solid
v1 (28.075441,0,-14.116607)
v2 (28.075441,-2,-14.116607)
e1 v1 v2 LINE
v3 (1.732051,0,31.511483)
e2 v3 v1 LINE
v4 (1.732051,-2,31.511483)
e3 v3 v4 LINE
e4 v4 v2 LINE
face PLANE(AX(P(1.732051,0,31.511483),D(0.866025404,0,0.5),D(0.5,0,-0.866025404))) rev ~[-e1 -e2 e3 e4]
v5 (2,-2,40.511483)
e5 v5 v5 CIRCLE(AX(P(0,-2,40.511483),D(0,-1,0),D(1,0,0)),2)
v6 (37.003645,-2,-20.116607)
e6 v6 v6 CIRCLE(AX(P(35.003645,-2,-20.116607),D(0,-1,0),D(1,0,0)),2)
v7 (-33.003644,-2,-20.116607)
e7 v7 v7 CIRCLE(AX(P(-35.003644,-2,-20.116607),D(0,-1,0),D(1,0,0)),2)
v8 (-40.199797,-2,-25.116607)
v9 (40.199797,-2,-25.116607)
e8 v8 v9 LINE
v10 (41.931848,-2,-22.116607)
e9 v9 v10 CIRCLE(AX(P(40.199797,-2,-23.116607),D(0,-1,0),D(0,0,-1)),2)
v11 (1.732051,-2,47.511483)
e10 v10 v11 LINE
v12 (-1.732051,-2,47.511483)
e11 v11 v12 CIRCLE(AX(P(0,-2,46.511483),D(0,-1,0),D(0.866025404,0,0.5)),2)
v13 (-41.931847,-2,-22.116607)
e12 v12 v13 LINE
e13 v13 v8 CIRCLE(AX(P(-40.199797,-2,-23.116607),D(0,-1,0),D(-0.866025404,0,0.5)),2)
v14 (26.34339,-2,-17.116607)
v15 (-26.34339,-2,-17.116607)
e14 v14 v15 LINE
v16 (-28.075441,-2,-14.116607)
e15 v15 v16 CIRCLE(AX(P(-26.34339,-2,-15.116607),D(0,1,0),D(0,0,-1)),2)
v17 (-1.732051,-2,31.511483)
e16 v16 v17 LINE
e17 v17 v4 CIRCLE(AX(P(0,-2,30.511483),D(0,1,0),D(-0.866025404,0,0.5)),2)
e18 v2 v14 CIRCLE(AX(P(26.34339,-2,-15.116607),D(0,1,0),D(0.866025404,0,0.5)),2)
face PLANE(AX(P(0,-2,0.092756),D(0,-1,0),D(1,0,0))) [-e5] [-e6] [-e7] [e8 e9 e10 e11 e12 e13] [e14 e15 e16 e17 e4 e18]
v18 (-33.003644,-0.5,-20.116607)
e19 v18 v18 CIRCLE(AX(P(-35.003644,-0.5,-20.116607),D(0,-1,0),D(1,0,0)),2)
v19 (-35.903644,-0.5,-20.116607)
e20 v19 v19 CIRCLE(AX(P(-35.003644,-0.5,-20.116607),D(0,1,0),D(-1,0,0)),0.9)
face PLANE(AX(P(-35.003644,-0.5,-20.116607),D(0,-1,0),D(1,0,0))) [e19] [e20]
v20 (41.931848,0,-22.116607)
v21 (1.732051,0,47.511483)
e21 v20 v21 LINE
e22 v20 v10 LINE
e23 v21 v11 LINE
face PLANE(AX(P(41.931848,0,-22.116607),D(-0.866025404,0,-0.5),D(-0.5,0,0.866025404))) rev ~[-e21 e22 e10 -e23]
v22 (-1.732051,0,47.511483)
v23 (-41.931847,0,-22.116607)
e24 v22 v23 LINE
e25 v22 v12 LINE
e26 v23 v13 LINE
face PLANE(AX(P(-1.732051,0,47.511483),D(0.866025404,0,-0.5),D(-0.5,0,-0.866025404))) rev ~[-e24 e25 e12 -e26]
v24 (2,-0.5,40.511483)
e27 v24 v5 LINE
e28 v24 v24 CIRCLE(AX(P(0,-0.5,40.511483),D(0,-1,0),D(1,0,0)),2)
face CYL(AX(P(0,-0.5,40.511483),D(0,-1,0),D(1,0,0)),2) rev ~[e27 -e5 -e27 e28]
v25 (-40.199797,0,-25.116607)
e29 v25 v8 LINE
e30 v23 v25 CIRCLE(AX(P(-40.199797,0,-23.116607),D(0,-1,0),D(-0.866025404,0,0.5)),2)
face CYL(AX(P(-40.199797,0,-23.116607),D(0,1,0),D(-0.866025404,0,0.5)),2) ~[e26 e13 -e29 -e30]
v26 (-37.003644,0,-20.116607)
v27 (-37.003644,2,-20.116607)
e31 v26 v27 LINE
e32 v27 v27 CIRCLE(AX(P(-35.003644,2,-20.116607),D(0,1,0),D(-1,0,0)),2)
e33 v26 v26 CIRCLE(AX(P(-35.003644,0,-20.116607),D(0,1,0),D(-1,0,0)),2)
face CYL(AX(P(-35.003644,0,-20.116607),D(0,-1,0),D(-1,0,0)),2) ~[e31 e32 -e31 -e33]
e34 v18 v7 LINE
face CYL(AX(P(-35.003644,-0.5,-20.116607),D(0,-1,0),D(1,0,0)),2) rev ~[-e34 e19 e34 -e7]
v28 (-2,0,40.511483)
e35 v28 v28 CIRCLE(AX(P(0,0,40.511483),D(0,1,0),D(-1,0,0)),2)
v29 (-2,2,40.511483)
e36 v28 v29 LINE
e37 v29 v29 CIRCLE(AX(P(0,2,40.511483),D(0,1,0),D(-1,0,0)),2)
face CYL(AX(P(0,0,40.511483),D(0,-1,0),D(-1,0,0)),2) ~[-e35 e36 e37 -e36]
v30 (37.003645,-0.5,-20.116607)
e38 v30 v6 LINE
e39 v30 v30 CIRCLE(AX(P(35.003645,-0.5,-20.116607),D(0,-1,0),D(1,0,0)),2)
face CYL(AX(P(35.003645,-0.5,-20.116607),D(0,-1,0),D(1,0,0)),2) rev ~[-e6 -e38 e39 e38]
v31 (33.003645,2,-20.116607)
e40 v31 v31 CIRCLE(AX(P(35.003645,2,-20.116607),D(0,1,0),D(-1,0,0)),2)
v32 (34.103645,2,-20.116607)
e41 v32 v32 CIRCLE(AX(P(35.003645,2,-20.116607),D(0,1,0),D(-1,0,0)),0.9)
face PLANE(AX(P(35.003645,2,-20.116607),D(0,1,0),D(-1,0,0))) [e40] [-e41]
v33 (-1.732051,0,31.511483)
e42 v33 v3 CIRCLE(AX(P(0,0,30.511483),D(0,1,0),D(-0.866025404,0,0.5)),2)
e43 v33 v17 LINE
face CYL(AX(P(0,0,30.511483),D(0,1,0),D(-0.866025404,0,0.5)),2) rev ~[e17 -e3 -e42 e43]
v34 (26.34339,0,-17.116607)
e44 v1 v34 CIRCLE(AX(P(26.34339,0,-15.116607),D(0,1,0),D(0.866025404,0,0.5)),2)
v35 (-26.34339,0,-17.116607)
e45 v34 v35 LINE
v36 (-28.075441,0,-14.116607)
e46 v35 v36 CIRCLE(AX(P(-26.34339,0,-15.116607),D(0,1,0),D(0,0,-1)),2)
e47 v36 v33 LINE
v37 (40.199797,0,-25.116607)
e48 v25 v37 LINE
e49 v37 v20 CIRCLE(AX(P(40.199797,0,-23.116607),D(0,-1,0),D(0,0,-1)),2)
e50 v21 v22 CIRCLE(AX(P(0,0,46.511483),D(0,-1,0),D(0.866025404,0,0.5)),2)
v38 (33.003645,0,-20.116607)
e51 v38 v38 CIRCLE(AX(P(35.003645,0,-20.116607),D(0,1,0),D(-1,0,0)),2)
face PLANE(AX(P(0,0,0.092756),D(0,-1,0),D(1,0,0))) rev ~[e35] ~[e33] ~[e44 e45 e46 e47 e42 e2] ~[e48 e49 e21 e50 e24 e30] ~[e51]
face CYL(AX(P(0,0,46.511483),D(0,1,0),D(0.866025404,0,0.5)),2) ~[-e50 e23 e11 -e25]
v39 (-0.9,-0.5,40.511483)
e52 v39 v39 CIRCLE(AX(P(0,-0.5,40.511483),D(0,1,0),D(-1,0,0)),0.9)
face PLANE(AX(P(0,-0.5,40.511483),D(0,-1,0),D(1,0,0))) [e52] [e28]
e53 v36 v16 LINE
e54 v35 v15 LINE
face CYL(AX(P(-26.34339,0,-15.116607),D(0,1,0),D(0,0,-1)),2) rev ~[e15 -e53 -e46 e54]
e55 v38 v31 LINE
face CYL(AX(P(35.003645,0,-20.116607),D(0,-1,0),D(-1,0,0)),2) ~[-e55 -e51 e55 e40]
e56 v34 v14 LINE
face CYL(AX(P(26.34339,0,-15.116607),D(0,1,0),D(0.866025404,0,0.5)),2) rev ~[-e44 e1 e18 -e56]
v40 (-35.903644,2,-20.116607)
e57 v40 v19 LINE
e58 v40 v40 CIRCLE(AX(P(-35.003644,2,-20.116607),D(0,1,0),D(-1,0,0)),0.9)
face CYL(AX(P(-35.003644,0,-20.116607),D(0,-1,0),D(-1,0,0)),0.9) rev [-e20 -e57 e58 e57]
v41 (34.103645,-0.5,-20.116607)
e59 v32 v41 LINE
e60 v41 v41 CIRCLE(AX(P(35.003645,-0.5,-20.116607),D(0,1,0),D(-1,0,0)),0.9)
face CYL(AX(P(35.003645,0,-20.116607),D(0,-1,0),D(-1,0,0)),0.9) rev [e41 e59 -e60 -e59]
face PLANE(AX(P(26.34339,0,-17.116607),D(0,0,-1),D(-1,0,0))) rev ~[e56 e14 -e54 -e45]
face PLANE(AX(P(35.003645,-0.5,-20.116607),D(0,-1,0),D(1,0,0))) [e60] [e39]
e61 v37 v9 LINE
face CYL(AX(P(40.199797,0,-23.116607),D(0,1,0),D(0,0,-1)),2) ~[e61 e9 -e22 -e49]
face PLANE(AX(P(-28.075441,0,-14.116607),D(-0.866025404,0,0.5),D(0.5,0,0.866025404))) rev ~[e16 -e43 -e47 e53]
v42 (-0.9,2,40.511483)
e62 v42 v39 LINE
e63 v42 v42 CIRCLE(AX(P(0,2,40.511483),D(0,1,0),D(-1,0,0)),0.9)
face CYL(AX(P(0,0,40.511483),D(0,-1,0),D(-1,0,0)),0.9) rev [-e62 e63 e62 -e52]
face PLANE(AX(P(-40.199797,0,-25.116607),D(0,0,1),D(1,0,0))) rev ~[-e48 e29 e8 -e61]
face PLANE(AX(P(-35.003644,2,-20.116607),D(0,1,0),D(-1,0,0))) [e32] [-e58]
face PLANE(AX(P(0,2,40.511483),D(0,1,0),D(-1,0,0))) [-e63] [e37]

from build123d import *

# Parameters (mm, degrees)
F1_DEPTH       = 2
F2_R           = 2
F2_R_2         = 0.9
F3_DEPTH       = 2
F5_D           = 1.8
F5_CBORE_D     = 4
F5_CBORE_DEPTH = 1.5


# Not quite as in the source:
# - after a boolean that leaves OpenCascade's solid faulty, fix() repairs it


with BuildPart() as f1:
    # F0 (on Front) → F1 (new body)
    with BuildSketch(Plane.XZ):
        with BuildLine():
            ThreePointArc((1.7320509844, 47.5114831651), (1.769e-07, 48.5114831651), (-1.7320506307, 47.5114831651))
            Line((-1.7320506307, 47.5114831651), (-41.9318474004, -22.1166072941))
            ThreePointArc((-41.9318474004, -22.1166072941), (-41.9318474004, -24.1166072941), (-40.1997965929, -25.1166072941))
            Line((-40.1997965929, -25.1166072941), (40.1997969466, -25.1166072941))
            ThreePointArc((40.1997969466, -25.1166072941), (41.9318477542, -24.1166072941), (41.9318477542, -22.1166072941))
            Line((41.9318477542, -22.1166072941), (1.7320509844, 47.5114831651))
        make_face()
        with BuildLine():
            ThreePointArc((-1.7320506307, 31.5114831651), (1.769e-07, 32.5114831651), (1.7320509844, 31.5114831651))
            Line((1.7320509844, 31.5114831651), (28.0754412936, -14.1166072941))
            ThreePointArc((28.0754412936, -14.1166072941), (28.0754412936, -16.1166072941), (26.343390486, -17.1166072941))
            Line((26.343390486, -17.1166072941), (-26.3433901323, -17.1166072941))
            ThreePointArc((-26.3433901323, -17.1166072941), (-28.0754409399, -16.1166072941), (-28.0754409399, -14.1166072941))
            Line((-28.0754409399, -14.1166072941), (-1.7320506307, 31.5114831651))
        make_face(mode=Mode.SUBTRACT)
    extrude(amount=F1_DEPTH)

    # F2 (on face) → F3 (join)
    with BuildSketch(Plane(origin=(0, 0, 0), x_dir=(-1, 0, 0), z_dir=(0, 1, 0))):
        with Locations((-1.769e-07, 40.5114831651)):
            Circle(F2_R)
        with Locations((-1.769e-07, 40.5114831651)):
            Circle(F2_R_2, mode=Mode.SUBTRACT)
        with Locations((-35.0036445239, -20.1166072941)):
            Circle(F2_R)
        with Locations((-35.0036445239, -20.1166072941)):
            Circle(F2_R_2, mode=Mode.SUBTRACT)
        with Locations((35.0036441701, -20.1166072941)):
            Circle(F2_R)
        with Locations((35.0036441701, -20.1166072941)):
            Circle(F2_R_2, mode=Mode.SUBTRACT)
    extrude(amount=F3_DEPTH)

    # F5 (through all)
    with Locations(Plane.XZ.offset(2)):
        with Locations((1.769e-07, 40.5114831651), (-35.0036441701, -20.1166072941), (35.0036445239, -20.1166072941)):
            CounterBoreHole(F5_D / 2, F5_CBORE_D / 2, F5_CBORE_DEPTH)

    add(f1.part.fix(), mode=Mode.REPLACE)


solid = f1.part
